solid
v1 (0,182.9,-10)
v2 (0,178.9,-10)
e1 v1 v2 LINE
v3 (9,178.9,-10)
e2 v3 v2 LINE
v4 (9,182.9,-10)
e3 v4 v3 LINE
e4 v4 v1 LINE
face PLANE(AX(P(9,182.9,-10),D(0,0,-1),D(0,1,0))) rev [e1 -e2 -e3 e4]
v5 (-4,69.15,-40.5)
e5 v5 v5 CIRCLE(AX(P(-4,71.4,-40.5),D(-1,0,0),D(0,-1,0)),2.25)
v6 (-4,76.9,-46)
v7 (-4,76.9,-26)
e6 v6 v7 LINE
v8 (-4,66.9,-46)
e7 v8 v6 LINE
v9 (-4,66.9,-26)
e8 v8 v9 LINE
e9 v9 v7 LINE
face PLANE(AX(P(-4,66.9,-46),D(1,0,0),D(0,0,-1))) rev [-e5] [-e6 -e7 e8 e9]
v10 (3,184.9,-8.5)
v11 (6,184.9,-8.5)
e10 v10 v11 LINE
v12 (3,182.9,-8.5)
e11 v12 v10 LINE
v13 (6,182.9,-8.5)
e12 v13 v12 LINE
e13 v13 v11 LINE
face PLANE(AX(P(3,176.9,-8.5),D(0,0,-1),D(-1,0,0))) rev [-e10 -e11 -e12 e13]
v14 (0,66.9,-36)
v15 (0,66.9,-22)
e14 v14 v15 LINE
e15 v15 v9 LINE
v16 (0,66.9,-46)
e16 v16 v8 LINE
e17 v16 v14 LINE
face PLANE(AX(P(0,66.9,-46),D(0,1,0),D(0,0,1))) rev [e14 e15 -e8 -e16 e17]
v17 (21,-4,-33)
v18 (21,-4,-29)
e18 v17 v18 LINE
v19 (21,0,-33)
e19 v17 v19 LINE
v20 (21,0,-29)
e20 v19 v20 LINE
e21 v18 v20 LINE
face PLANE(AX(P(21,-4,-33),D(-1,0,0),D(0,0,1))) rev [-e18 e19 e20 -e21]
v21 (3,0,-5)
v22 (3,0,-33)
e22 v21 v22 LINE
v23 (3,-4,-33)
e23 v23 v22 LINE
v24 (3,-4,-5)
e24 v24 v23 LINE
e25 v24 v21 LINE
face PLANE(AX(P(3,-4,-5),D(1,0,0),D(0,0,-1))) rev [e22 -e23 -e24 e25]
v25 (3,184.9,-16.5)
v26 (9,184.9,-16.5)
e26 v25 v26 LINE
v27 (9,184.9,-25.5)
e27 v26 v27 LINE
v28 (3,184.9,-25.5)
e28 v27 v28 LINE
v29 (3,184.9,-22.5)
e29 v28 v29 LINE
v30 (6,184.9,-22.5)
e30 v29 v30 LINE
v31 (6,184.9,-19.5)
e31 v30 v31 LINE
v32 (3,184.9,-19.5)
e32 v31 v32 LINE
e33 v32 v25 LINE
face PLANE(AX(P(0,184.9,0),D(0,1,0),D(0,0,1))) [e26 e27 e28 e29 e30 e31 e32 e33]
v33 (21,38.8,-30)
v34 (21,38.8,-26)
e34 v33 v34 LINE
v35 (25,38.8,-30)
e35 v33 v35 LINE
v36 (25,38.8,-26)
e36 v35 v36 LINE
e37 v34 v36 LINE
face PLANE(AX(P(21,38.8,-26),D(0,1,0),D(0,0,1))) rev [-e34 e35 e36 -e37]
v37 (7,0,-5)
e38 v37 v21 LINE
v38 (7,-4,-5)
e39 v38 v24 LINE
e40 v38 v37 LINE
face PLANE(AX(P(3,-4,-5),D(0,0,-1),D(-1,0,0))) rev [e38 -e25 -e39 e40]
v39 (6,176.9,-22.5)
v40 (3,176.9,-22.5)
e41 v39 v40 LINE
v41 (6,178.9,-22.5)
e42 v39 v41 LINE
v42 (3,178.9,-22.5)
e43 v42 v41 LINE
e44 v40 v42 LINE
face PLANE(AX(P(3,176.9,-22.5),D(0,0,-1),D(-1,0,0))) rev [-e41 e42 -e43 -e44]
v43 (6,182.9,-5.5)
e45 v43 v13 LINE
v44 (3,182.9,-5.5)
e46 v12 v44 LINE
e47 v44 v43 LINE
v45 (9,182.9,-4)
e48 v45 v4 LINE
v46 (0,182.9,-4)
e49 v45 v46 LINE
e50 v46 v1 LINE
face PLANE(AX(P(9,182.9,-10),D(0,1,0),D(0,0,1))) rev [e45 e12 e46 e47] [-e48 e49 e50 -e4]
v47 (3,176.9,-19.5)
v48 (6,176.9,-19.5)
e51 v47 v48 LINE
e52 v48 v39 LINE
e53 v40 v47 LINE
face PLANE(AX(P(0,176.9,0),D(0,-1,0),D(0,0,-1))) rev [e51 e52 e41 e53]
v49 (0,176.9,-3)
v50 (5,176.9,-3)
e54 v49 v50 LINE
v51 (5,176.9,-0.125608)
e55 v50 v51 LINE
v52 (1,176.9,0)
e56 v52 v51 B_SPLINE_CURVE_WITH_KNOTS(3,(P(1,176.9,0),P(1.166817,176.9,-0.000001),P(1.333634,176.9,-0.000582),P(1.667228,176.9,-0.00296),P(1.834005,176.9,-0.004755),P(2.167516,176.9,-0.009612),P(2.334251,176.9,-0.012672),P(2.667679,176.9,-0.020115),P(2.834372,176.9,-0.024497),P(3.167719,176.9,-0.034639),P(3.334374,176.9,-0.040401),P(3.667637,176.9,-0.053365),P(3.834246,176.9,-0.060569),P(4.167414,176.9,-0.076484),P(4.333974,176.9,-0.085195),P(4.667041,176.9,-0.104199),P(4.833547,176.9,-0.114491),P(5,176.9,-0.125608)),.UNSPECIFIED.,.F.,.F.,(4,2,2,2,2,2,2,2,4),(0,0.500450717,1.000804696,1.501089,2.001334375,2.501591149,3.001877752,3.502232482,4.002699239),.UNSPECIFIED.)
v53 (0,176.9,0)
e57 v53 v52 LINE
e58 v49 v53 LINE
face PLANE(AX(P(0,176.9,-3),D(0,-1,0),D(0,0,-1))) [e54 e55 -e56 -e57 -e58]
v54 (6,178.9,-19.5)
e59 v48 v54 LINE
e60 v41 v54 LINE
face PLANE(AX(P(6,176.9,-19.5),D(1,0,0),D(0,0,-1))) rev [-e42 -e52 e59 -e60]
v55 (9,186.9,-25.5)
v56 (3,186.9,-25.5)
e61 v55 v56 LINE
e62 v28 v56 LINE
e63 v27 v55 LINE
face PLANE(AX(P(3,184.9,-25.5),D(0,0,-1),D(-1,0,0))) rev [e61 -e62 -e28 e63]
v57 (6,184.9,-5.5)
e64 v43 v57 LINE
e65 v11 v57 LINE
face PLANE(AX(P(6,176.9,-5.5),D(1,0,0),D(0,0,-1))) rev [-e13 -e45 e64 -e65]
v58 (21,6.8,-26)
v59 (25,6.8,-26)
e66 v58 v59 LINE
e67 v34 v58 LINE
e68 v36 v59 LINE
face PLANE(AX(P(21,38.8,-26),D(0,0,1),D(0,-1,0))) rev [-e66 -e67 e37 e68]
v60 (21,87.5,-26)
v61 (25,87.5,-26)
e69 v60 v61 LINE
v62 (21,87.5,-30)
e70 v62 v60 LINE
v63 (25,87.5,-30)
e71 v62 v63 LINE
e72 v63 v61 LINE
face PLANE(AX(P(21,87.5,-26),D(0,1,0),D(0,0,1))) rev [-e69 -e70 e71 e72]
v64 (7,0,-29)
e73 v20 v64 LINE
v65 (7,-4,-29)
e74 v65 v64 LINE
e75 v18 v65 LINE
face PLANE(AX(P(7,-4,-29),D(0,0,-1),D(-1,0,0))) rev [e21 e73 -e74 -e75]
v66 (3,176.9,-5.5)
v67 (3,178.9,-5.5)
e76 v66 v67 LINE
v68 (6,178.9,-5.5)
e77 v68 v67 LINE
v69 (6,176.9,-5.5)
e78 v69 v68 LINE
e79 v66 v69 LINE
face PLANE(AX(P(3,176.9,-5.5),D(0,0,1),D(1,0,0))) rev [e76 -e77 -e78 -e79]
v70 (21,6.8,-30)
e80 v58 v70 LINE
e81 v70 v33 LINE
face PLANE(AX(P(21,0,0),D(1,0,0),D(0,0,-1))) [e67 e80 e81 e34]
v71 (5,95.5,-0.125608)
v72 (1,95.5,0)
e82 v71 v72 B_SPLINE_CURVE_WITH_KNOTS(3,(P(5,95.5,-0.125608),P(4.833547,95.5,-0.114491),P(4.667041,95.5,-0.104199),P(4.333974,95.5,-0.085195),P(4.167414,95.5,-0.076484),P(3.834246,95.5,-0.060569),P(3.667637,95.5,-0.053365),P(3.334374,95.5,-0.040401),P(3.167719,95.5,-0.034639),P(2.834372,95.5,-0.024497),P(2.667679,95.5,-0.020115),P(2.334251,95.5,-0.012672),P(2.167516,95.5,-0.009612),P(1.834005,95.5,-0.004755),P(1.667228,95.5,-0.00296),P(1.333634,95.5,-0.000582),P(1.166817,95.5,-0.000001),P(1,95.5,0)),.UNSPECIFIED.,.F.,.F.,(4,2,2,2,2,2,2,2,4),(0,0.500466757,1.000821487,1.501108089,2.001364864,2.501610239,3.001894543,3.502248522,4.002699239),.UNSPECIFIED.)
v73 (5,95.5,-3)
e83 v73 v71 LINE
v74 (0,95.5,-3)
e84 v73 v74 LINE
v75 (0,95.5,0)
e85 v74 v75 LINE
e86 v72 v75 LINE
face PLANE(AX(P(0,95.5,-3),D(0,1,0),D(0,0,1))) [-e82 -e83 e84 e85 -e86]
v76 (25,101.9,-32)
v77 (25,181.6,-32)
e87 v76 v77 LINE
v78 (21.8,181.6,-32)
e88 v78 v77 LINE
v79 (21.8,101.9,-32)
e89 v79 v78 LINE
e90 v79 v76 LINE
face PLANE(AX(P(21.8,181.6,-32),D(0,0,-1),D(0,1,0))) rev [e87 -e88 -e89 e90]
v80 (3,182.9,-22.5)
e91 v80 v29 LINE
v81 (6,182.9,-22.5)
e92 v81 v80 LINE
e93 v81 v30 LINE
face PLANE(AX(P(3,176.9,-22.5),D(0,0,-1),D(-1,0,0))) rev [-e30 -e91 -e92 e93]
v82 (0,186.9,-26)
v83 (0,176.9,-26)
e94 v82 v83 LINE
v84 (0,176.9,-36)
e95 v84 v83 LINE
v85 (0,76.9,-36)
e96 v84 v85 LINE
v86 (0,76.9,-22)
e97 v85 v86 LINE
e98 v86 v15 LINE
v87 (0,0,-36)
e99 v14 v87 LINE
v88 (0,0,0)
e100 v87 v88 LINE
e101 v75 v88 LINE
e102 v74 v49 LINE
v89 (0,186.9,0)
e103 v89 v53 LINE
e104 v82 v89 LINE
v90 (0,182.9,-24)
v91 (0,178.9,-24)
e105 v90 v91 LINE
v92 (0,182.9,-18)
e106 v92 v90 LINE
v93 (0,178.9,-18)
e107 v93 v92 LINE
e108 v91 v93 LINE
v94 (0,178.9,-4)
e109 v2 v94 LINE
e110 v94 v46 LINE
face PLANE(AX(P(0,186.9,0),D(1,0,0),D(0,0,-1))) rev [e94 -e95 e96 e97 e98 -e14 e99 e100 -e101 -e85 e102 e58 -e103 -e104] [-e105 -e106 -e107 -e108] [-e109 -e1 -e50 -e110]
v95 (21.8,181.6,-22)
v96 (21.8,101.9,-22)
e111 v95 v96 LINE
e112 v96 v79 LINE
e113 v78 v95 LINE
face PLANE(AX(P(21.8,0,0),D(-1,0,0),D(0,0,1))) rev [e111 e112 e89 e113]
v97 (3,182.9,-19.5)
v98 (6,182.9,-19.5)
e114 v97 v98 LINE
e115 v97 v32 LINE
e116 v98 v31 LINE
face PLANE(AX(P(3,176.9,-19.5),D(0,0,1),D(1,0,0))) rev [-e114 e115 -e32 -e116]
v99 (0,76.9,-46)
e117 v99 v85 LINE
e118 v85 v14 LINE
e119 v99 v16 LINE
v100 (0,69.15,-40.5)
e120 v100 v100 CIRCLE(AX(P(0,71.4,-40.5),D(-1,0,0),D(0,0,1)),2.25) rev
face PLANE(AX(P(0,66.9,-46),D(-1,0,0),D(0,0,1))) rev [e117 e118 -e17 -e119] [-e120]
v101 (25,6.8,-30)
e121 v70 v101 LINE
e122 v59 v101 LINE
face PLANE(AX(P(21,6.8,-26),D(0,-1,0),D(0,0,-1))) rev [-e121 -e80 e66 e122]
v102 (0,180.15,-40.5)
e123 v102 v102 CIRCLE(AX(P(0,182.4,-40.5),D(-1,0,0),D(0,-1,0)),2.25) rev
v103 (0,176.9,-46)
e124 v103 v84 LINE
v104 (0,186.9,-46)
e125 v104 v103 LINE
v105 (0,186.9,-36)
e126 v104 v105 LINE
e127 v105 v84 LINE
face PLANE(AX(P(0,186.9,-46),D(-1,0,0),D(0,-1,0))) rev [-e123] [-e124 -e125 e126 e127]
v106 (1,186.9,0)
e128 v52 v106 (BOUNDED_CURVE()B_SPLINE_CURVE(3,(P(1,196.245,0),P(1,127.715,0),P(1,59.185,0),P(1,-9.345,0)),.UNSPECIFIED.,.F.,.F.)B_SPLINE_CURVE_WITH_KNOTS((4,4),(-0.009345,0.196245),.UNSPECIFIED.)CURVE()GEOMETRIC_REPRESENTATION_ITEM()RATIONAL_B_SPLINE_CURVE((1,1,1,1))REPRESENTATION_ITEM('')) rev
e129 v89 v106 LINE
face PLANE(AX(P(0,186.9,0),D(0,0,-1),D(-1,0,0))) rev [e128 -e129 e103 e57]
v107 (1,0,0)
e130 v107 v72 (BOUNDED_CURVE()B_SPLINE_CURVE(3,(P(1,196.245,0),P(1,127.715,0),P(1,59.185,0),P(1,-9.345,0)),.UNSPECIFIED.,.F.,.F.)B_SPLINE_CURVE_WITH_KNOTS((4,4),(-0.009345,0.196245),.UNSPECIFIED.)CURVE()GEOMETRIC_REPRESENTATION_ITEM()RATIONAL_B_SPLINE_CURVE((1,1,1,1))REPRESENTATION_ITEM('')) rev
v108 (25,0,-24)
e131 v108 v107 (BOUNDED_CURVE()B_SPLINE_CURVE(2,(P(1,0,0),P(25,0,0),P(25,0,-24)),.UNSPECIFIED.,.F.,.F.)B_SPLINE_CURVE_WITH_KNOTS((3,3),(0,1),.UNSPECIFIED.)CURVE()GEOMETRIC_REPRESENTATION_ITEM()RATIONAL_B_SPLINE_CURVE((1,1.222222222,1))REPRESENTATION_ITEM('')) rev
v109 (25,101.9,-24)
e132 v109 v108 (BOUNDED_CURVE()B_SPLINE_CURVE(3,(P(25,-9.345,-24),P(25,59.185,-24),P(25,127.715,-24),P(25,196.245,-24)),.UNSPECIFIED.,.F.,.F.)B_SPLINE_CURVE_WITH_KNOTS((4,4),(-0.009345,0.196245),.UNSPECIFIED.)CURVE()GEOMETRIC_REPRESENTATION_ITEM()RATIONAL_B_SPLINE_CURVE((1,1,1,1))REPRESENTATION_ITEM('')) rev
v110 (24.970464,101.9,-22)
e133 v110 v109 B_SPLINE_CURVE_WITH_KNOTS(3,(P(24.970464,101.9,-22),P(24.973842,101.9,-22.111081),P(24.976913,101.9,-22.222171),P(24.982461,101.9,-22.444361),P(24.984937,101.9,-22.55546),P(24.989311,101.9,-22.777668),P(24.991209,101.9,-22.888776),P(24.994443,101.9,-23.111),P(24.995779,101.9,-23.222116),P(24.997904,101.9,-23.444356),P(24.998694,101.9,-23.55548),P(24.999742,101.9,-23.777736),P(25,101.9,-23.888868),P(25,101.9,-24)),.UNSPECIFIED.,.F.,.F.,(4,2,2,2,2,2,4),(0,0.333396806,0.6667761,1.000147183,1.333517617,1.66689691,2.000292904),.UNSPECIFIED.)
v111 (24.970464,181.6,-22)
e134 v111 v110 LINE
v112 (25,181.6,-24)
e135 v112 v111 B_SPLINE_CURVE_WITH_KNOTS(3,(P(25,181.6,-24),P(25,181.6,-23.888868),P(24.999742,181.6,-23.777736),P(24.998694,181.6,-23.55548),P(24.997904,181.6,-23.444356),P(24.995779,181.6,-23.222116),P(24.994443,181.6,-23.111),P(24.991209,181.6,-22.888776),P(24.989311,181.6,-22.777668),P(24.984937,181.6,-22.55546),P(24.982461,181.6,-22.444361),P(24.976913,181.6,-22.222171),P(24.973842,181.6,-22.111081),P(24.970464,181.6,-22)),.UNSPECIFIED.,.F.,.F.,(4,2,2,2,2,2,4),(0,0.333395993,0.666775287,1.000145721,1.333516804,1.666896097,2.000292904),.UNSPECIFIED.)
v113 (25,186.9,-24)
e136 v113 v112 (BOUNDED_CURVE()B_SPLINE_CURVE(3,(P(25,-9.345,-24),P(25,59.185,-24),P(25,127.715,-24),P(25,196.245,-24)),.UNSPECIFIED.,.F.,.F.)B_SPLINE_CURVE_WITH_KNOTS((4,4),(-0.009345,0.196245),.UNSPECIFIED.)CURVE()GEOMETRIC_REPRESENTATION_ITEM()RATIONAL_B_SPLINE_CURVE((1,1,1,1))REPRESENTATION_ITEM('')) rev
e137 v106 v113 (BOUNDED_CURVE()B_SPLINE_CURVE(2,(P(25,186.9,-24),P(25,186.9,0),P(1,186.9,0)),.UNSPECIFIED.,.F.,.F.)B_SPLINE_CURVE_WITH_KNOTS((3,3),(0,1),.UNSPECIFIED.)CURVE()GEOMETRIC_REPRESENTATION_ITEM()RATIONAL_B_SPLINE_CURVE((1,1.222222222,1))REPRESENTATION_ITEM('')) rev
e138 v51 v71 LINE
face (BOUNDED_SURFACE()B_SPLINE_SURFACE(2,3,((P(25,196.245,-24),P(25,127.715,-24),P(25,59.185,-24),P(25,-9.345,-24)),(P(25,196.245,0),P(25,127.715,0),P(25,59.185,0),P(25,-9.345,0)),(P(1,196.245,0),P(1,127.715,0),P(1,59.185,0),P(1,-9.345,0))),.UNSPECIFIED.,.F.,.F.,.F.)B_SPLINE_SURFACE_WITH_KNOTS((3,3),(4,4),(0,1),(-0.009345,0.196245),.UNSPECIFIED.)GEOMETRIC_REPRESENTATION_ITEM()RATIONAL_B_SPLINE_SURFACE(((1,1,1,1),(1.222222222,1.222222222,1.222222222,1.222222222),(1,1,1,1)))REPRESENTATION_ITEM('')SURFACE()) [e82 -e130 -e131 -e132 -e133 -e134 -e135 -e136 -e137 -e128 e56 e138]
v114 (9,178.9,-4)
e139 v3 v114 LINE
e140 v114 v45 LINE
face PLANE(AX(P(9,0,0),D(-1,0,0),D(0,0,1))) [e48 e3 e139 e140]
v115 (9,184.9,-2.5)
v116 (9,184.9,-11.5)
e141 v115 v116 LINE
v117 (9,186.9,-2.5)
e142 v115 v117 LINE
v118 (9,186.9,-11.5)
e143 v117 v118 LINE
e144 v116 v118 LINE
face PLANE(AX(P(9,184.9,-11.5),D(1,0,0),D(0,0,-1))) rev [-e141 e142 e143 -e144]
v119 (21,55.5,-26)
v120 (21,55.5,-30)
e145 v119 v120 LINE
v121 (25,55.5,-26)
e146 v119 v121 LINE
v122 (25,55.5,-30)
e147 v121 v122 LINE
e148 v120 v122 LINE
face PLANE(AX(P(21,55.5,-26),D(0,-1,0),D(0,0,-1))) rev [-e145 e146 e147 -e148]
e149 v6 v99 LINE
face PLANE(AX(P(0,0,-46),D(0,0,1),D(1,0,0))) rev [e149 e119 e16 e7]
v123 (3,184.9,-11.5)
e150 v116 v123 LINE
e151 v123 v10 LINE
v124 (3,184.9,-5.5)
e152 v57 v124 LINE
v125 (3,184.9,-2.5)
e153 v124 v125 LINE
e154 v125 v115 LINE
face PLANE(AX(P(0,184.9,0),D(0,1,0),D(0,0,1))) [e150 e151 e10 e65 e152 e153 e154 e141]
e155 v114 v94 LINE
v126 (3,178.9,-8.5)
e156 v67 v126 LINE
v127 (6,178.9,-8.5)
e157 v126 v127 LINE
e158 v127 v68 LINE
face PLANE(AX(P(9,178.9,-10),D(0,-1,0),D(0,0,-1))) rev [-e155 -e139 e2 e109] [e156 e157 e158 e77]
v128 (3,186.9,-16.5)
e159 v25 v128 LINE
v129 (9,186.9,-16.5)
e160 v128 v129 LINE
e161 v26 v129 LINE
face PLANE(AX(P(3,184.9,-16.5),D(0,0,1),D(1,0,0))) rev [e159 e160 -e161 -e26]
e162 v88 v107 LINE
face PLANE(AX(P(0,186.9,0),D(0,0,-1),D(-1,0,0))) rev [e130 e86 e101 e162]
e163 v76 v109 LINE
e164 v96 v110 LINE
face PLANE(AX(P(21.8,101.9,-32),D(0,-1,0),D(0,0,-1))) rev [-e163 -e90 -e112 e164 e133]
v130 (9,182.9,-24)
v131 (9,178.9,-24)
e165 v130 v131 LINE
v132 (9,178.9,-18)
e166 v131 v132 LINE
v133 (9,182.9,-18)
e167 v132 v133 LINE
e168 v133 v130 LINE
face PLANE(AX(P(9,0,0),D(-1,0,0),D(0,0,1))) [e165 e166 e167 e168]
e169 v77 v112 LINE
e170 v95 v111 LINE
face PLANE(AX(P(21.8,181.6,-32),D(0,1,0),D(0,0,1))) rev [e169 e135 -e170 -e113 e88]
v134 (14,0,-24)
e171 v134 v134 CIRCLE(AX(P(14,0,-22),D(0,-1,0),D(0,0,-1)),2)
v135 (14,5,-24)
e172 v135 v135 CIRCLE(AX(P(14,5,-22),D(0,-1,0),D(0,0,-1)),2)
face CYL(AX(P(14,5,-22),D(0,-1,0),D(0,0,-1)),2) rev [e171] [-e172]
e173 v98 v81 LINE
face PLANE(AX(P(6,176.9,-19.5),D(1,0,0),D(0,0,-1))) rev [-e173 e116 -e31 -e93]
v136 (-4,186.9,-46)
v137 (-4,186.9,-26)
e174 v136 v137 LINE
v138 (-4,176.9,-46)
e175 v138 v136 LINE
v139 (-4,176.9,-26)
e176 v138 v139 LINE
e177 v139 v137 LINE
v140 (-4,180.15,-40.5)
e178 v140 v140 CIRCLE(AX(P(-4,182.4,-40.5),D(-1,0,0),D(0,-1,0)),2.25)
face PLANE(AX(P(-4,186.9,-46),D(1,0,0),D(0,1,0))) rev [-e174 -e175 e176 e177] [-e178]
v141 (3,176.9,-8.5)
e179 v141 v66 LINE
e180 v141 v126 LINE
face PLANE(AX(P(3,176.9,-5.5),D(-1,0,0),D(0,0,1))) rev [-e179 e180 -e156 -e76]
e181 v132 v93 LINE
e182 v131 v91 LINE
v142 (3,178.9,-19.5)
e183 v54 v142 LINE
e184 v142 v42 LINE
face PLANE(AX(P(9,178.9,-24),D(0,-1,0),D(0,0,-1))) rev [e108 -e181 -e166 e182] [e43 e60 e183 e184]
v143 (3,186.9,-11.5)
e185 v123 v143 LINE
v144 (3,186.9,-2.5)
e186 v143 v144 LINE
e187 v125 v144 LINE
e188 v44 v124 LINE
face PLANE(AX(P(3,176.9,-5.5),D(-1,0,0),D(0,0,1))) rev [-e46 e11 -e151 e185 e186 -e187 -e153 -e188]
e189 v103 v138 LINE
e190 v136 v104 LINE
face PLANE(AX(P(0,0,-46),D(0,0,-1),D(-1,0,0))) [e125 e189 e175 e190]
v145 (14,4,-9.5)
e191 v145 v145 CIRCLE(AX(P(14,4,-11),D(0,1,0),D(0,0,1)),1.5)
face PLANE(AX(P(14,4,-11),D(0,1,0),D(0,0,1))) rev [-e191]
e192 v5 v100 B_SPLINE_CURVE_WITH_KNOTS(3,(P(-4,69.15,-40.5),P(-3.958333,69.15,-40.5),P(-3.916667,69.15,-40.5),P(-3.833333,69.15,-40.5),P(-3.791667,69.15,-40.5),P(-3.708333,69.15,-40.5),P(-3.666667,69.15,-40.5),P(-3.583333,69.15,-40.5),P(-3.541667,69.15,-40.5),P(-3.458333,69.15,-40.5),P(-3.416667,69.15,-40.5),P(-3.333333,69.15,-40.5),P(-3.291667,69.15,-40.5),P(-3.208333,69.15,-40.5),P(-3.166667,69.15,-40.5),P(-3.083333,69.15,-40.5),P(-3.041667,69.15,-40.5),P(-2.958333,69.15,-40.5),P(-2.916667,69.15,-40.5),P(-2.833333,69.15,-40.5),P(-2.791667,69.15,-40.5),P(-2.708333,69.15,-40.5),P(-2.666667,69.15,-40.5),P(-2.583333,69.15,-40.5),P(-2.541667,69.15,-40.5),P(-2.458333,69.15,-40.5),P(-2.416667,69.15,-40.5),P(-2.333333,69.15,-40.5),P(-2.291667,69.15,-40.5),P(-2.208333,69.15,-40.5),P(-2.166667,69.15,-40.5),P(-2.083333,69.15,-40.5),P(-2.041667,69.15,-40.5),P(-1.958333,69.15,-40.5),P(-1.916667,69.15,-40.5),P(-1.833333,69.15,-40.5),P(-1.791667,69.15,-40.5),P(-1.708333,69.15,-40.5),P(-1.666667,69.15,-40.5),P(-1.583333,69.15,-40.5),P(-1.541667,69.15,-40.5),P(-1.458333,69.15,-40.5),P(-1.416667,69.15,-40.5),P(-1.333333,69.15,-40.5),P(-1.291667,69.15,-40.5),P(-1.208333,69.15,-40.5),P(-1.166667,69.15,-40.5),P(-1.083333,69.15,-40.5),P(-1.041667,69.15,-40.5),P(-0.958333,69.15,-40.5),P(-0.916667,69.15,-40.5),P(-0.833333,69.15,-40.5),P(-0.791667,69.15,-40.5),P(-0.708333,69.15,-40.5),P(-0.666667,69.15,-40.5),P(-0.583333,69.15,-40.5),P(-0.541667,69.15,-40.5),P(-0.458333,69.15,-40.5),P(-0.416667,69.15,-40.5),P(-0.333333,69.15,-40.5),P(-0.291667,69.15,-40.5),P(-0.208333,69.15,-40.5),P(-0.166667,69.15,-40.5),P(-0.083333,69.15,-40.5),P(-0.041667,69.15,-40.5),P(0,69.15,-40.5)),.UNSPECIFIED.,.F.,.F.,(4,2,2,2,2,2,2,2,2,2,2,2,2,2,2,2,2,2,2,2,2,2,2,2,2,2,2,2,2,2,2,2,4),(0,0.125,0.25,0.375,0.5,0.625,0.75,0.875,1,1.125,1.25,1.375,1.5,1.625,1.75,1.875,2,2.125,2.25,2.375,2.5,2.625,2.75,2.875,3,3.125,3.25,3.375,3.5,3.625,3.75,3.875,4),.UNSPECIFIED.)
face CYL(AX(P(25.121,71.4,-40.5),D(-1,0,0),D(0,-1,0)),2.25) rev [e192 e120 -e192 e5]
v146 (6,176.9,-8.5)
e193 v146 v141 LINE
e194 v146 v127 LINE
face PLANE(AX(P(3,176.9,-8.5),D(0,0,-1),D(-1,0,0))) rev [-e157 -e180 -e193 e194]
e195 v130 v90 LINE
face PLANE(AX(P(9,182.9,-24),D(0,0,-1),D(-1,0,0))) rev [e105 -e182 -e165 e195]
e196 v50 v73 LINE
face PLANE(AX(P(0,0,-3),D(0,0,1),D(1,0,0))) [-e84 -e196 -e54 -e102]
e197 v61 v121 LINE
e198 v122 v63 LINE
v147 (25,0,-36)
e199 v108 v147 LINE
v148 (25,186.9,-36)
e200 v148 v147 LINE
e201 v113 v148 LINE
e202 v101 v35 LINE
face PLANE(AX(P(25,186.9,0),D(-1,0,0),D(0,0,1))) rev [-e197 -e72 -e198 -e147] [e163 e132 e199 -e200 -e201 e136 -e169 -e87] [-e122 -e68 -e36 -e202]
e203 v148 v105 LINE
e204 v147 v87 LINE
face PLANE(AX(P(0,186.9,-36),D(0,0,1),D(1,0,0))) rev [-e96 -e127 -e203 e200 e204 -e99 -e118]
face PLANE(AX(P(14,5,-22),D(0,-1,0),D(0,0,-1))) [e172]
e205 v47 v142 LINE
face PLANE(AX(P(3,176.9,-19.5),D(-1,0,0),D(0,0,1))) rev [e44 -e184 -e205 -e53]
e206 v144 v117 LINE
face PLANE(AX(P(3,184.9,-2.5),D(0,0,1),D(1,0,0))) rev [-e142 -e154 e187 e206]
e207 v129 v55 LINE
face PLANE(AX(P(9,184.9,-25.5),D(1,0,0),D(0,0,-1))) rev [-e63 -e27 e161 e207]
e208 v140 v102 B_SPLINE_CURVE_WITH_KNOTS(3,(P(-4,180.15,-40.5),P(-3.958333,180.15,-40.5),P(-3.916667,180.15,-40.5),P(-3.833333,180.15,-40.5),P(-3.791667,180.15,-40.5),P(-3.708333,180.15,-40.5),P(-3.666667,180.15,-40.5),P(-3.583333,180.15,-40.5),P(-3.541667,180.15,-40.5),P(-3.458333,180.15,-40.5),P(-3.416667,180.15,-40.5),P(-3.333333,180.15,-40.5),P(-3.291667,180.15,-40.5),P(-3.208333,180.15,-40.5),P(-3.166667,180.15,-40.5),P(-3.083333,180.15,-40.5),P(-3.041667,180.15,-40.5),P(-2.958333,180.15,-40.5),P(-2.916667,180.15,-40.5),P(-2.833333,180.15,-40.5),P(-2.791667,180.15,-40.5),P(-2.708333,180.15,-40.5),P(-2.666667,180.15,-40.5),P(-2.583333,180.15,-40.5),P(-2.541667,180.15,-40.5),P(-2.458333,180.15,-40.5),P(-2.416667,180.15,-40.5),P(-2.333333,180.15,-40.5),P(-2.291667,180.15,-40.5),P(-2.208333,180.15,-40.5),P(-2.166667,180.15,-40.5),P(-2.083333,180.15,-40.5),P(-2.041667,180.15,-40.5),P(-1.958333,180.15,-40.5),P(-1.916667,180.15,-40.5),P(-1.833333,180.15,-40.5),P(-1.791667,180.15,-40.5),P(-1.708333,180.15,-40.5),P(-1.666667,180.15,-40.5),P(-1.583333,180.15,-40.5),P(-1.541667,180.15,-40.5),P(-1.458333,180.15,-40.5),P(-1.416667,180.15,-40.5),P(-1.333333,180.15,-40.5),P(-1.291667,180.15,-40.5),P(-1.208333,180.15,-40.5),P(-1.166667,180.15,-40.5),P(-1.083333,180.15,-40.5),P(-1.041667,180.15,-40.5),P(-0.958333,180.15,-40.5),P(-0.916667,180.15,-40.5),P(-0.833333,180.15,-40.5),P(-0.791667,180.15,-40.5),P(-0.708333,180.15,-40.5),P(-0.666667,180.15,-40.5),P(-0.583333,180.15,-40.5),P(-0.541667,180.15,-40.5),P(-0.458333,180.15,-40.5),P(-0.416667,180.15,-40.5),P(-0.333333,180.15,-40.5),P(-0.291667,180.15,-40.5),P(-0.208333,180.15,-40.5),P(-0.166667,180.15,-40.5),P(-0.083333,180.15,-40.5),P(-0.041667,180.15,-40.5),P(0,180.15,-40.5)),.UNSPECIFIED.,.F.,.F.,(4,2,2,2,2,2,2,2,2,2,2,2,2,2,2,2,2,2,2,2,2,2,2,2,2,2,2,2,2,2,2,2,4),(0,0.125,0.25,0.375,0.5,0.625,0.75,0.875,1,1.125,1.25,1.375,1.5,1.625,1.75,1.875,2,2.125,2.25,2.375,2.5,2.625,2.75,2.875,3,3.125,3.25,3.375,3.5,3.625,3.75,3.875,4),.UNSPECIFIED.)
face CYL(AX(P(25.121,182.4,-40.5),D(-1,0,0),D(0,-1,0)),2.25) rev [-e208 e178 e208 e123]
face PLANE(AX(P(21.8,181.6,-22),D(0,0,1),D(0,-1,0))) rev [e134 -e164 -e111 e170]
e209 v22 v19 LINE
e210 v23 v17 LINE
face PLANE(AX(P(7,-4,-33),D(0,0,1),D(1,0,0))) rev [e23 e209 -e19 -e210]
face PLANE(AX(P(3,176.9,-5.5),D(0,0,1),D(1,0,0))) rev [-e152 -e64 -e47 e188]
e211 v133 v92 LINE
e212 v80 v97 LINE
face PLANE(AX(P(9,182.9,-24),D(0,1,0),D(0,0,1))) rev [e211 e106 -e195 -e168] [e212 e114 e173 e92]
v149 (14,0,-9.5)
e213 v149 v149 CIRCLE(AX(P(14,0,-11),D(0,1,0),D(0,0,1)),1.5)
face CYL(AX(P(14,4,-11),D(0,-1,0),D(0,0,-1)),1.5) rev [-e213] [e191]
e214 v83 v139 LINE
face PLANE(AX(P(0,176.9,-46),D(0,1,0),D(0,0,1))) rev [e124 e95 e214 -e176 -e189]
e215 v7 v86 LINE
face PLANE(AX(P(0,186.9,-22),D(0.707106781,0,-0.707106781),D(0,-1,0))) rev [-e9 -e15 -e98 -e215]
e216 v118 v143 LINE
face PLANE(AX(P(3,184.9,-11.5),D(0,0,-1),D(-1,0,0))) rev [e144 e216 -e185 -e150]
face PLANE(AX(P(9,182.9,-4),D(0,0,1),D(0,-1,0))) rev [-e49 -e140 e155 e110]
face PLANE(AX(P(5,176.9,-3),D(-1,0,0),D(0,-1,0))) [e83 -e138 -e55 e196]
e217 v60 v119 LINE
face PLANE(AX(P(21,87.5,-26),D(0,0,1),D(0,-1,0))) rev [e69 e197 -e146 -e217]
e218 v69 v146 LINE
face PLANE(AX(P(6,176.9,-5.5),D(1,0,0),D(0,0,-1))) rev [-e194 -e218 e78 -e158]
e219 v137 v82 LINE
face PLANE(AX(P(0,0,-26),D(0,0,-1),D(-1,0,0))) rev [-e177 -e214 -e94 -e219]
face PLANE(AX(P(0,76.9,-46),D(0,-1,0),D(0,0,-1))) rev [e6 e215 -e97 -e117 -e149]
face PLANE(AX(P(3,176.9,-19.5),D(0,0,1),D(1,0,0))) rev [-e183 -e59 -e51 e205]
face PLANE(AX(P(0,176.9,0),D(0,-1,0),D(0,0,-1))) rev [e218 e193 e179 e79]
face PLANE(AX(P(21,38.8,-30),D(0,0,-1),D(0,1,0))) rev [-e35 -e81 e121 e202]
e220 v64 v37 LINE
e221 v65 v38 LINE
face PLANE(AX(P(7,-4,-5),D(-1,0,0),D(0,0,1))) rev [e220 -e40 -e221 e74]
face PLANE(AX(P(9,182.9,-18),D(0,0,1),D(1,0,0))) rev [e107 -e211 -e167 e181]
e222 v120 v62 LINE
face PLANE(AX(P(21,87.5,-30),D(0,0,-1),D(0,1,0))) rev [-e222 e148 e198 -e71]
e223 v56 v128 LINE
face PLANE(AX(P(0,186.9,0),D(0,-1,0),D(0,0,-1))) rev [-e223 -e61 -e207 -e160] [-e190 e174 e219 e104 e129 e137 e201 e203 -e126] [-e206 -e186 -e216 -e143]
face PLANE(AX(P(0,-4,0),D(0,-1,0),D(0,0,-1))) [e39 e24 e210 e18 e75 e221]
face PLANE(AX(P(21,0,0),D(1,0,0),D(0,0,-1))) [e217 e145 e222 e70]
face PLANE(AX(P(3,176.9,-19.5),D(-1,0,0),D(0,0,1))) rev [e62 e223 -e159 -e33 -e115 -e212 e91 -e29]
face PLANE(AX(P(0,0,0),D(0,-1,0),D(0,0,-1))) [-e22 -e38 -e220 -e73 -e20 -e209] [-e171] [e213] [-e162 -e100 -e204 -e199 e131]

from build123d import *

# Parameters (mm, degrees)
SKETCH1_W                = 25
SKETCH1_H                = 36
BOSS_EXTRUDE1_DEPTH      = 186.9
FILLET1_SIZE             = 24
SKETCH2_W                = 5
SKETCH2_H                = 81.4
CUT_EXTRUDE1_DEPTH       = 3
BOSS_EXTRUDE3_DEPTH      = 10
BOSS_EXTRUDE3_DEPTH_BACK = 10
SKETCH6_W                = 4
SKETCH6_H                = 10
CUT_EXTRUDE2_REACH       = 196.65
SKETCH7_R                = 2.25
CHAMFER1_SIZE            = 4
SKETCH8_W                = 6
SKETCH8_H                = 4
CUT_EXTRUDE3_DEPTH       = 9
SKETCH9_W                = 3
SKETCH9_H                = 3
CUT_EXTRUDE4_DEPTH       = 10
BOSS_EXTRUDE4_DEPTH      = 4
SKETCH11_R               = 2
CUT_EXTRUDE5_DEPTH       = 5
SKETCH14_R               = 1.5
CUT_EXTRUDE6_DEPTH       = 4
SKETCH15_W               = 4
SKETCH15_H               = 32
CUT_EXTRUDE7_DEPTH       = 4
SKETCH16_W               = 10
SKETCH16_H               = 79.7
CUT_EXTRUDE8_DEPTH       = 3.2
SKETCH17_W               = 6
SKETCH17_H               = 9
CUT_EXTRUDE9_DEPTH       = 2


# Some blends are built 0.0001 mm under size
with BuildPart() as part:
    # Sketch1 → Boss-Extrude1 (new body)
    with BuildSketch(Plane(origin=(0, 0, 0), x_dir=(1, 0, 0), z_dir=(0, 1, 0))):
        with Locations((12.5, 18)):
            Rectangle(SKETCH1_W, SKETCH1_H)
    extrude(amount=BOSS_EXTRUDE1_DEPTH)

    # Fillet1
    # a fillet whose section is not a circle: 24 mm, written as the material it takes off along each edge
    with BuildSketch(Plane(origin=(25, -60, 0), x_dir=(-1, 0, 0), z_dir=(0, 1, 0))) as fillet1_piece_1:
        with BuildLine():
            Bezier((FILLET1_SIZE, 0), (0, 0), (0, -FILLET1_SIZE), weights=[1, 1.222222222, 1])
            Line((0, -FILLET1_SIZE), (0, 0))
            Line((0, 0), (FILLET1_SIZE, 0))
        make_face()
    extrude(amount=306.9, mode=Mode.SUBTRACT)

    # Sketch2 → Cut-Extrude1 (cut)
    with BuildSketch(Plane(origin=(0, 0, 0), x_dir=(-1, 0, 0), z_dir=(0, 0, -1))):
        with Locations((-2.5, 136.2)):
            Rectangle(SKETCH2_W, SKETCH2_H)
    extrude(amount=CUT_EXTRUDE1_DEPTH, mode=Mode.SUBTRACT)

    # Sketch6 → Boss-Extrude3 (add, two sides: drawn at the far end of the back side and taken through both)
    with BuildSketch(Plane(origin=(0, 0, -36), x_dir=(-1, 0, 0), z_dir=(0, 0, -1)).offset(-BOSS_EXTRUDE3_DEPTH_BACK)):
        with Locations((2, 181.9)):
            Rectangle(SKETCH6_W, SKETCH6_H)
        with Locations((2, 71.9)):
            Rectangle(SKETCH6_W, SKETCH6_H)
    extrude(amount=BOSS_EXTRUDE3_DEPTH + BOSS_EXTRUDE3_DEPTH_BACK)

    # Sketch7 → Cut-Extrude2 (cut, up to next)
    with BuildSketch(Plane.ZY.offset(4), mode=Mode.PRIVATE) as cut_extrude2_sk1:
        with Locations(Location((-40.5, 182.4, 0), (0, 0, 270))):
            Circle(SKETCH7_R)
    cut_extrude2_tool1 = extrude(cut_extrude2_sk1.sketch, amount=-CUT_EXTRUDE2_REACH, mode=Mode.PRIVATE) & part.part
    # Sketch7 → Cut-Extrude2 (cut, up to next)
    with BuildSketch(Plane.ZY.offset(4), mode=Mode.PRIVATE) as cut_extrude2_sk2:
        with Locations(Location((-40.5, 71.4, 0), (0, 0, 270))):
            Circle(SKETCH7_R)
    cut_extrude2_tool2 = extrude(cut_extrude2_sk2.sketch, amount=-CUT_EXTRUDE2_REACH, mode=Mode.PRIVATE) & part.part
    add(cut_extrude2_tool1.solids().sort_by_distance((-4, 182.4, -40.5))[0], mode=Mode.SUBTRACT)
    add(cut_extrude2_tool2.solids().sort_by_distance((-4, 71.4, -40.5))[0], mode=Mode.SUBTRACT)

    # Chamfer1
    chamfer1_edges = [part.edges().sort_by_distance(p)[0] for p in [
        (0, 71.9, -26),
    ]]
    chamfer(chamfer1_edges, length=CHAMFER1_SIZE - 0.0001)  # a hair under: the kernel refuses the full size

    # Sketch8 → Cut-Extrude3 (cut)
    with BuildSketch(Plane.ZY):
        with Locations((-7, 180.9)):
            Rectangle(SKETCH8_W, SKETCH8_H)
        with Locations((-21, 180.9)):
            Rectangle(SKETCH8_W, SKETCH8_H)
    extrude(amount=-CUT_EXTRUDE3_DEPTH, mode=Mode.SUBTRACT)

    # Sketch9 → Cut-Extrude4 (cut)
    with BuildSketch(Plane(origin=(0, 186.9, 0), x_dir=(1, 0, 0), z_dir=(0, 1, 0))):
        with Locations((4.5, 7)):
            Rectangle(SKETCH9_W, SKETCH9_H)
        with Locations((4.5, 21)):
            Rectangle(SKETCH9_W, SKETCH9_H)
    extrude(amount=-CUT_EXTRUDE4_DEPTH, mode=Mode.SUBTRACT)

    # Sketch10 → Boss-Extrude4 (add)
    with BuildSketch(Plane.XZ):
        Polygon((3, -5), (7, -5), (7, -29), (21, -29), (21, -33), (7, -33), (3, -33), align=None)
    extrude(amount=BOSS_EXTRUDE4_DEPTH)

    # Sketch11 → Cut-Extrude5 (cut)
    with BuildSketch(Plane.XZ):
        with Locations(Location((14, -22, 0), (0, 0, 270))):
            Circle(SKETCH11_R)
    extrude(amount=-CUT_EXTRUDE5_DEPTH, mode=Mode.SUBTRACT)

    # Sketch14 → Cut-Extrude6 (cut)
    with BuildSketch(Plane(origin=(0, 0, 0), x_dir=(-1, 0, 0), z_dir=(0, 1, 0))):
        with Locations(Location((-14, -11, 0), (0, 0, 90))):
            Circle(SKETCH14_R)
    extrude(amount=CUT_EXTRUDE6_DEPTH, mode=Mode.SUBTRACT)

    # Sketch15 → Cut-Extrude7 (cut)
    with BuildSketch(Plane(origin=(25, 0, 0), x_dir=(0, 0, -1), z_dir=(1, 0, 0))):
        with Locations((28, 71.5)):
            Rectangle(SKETCH15_W, SKETCH15_H)
        with Locations((28, 22.8)):
            Rectangle(SKETCH15_W, SKETCH15_H)
    extrude(amount=-CUT_EXTRUDE7_DEPTH, mode=Mode.SUBTRACT)

    # Sketch16 → Cut-Extrude8 (cut)
    with BuildSketch(Plane(origin=(25, 0, 0), x_dir=(0, 0, -1), z_dir=(1, 0, 0))):
        with Locations((27, 141.75)):
            Rectangle(SKETCH16_W, SKETCH16_H)
    extrude(amount=-CUT_EXTRUDE8_DEPTH, mode=Mode.SUBTRACT)

    # Sketch17 → Cut-Extrude9 (cut)
    with BuildSketch(Plane(origin=(0, 186.9, 0), x_dir=(1, 0, 0), z_dir=(0, 1, 0))):
        with Locations((6, 21)):
            Rectangle(SKETCH17_W, SKETCH17_H)
        with Locations((6, 7)):
            Rectangle(SKETCH17_W, SKETCH17_H)
    extrude(amount=-CUT_EXTRUDE9_DEPTH, mode=Mode.SUBTRACT)


solid = part.part
